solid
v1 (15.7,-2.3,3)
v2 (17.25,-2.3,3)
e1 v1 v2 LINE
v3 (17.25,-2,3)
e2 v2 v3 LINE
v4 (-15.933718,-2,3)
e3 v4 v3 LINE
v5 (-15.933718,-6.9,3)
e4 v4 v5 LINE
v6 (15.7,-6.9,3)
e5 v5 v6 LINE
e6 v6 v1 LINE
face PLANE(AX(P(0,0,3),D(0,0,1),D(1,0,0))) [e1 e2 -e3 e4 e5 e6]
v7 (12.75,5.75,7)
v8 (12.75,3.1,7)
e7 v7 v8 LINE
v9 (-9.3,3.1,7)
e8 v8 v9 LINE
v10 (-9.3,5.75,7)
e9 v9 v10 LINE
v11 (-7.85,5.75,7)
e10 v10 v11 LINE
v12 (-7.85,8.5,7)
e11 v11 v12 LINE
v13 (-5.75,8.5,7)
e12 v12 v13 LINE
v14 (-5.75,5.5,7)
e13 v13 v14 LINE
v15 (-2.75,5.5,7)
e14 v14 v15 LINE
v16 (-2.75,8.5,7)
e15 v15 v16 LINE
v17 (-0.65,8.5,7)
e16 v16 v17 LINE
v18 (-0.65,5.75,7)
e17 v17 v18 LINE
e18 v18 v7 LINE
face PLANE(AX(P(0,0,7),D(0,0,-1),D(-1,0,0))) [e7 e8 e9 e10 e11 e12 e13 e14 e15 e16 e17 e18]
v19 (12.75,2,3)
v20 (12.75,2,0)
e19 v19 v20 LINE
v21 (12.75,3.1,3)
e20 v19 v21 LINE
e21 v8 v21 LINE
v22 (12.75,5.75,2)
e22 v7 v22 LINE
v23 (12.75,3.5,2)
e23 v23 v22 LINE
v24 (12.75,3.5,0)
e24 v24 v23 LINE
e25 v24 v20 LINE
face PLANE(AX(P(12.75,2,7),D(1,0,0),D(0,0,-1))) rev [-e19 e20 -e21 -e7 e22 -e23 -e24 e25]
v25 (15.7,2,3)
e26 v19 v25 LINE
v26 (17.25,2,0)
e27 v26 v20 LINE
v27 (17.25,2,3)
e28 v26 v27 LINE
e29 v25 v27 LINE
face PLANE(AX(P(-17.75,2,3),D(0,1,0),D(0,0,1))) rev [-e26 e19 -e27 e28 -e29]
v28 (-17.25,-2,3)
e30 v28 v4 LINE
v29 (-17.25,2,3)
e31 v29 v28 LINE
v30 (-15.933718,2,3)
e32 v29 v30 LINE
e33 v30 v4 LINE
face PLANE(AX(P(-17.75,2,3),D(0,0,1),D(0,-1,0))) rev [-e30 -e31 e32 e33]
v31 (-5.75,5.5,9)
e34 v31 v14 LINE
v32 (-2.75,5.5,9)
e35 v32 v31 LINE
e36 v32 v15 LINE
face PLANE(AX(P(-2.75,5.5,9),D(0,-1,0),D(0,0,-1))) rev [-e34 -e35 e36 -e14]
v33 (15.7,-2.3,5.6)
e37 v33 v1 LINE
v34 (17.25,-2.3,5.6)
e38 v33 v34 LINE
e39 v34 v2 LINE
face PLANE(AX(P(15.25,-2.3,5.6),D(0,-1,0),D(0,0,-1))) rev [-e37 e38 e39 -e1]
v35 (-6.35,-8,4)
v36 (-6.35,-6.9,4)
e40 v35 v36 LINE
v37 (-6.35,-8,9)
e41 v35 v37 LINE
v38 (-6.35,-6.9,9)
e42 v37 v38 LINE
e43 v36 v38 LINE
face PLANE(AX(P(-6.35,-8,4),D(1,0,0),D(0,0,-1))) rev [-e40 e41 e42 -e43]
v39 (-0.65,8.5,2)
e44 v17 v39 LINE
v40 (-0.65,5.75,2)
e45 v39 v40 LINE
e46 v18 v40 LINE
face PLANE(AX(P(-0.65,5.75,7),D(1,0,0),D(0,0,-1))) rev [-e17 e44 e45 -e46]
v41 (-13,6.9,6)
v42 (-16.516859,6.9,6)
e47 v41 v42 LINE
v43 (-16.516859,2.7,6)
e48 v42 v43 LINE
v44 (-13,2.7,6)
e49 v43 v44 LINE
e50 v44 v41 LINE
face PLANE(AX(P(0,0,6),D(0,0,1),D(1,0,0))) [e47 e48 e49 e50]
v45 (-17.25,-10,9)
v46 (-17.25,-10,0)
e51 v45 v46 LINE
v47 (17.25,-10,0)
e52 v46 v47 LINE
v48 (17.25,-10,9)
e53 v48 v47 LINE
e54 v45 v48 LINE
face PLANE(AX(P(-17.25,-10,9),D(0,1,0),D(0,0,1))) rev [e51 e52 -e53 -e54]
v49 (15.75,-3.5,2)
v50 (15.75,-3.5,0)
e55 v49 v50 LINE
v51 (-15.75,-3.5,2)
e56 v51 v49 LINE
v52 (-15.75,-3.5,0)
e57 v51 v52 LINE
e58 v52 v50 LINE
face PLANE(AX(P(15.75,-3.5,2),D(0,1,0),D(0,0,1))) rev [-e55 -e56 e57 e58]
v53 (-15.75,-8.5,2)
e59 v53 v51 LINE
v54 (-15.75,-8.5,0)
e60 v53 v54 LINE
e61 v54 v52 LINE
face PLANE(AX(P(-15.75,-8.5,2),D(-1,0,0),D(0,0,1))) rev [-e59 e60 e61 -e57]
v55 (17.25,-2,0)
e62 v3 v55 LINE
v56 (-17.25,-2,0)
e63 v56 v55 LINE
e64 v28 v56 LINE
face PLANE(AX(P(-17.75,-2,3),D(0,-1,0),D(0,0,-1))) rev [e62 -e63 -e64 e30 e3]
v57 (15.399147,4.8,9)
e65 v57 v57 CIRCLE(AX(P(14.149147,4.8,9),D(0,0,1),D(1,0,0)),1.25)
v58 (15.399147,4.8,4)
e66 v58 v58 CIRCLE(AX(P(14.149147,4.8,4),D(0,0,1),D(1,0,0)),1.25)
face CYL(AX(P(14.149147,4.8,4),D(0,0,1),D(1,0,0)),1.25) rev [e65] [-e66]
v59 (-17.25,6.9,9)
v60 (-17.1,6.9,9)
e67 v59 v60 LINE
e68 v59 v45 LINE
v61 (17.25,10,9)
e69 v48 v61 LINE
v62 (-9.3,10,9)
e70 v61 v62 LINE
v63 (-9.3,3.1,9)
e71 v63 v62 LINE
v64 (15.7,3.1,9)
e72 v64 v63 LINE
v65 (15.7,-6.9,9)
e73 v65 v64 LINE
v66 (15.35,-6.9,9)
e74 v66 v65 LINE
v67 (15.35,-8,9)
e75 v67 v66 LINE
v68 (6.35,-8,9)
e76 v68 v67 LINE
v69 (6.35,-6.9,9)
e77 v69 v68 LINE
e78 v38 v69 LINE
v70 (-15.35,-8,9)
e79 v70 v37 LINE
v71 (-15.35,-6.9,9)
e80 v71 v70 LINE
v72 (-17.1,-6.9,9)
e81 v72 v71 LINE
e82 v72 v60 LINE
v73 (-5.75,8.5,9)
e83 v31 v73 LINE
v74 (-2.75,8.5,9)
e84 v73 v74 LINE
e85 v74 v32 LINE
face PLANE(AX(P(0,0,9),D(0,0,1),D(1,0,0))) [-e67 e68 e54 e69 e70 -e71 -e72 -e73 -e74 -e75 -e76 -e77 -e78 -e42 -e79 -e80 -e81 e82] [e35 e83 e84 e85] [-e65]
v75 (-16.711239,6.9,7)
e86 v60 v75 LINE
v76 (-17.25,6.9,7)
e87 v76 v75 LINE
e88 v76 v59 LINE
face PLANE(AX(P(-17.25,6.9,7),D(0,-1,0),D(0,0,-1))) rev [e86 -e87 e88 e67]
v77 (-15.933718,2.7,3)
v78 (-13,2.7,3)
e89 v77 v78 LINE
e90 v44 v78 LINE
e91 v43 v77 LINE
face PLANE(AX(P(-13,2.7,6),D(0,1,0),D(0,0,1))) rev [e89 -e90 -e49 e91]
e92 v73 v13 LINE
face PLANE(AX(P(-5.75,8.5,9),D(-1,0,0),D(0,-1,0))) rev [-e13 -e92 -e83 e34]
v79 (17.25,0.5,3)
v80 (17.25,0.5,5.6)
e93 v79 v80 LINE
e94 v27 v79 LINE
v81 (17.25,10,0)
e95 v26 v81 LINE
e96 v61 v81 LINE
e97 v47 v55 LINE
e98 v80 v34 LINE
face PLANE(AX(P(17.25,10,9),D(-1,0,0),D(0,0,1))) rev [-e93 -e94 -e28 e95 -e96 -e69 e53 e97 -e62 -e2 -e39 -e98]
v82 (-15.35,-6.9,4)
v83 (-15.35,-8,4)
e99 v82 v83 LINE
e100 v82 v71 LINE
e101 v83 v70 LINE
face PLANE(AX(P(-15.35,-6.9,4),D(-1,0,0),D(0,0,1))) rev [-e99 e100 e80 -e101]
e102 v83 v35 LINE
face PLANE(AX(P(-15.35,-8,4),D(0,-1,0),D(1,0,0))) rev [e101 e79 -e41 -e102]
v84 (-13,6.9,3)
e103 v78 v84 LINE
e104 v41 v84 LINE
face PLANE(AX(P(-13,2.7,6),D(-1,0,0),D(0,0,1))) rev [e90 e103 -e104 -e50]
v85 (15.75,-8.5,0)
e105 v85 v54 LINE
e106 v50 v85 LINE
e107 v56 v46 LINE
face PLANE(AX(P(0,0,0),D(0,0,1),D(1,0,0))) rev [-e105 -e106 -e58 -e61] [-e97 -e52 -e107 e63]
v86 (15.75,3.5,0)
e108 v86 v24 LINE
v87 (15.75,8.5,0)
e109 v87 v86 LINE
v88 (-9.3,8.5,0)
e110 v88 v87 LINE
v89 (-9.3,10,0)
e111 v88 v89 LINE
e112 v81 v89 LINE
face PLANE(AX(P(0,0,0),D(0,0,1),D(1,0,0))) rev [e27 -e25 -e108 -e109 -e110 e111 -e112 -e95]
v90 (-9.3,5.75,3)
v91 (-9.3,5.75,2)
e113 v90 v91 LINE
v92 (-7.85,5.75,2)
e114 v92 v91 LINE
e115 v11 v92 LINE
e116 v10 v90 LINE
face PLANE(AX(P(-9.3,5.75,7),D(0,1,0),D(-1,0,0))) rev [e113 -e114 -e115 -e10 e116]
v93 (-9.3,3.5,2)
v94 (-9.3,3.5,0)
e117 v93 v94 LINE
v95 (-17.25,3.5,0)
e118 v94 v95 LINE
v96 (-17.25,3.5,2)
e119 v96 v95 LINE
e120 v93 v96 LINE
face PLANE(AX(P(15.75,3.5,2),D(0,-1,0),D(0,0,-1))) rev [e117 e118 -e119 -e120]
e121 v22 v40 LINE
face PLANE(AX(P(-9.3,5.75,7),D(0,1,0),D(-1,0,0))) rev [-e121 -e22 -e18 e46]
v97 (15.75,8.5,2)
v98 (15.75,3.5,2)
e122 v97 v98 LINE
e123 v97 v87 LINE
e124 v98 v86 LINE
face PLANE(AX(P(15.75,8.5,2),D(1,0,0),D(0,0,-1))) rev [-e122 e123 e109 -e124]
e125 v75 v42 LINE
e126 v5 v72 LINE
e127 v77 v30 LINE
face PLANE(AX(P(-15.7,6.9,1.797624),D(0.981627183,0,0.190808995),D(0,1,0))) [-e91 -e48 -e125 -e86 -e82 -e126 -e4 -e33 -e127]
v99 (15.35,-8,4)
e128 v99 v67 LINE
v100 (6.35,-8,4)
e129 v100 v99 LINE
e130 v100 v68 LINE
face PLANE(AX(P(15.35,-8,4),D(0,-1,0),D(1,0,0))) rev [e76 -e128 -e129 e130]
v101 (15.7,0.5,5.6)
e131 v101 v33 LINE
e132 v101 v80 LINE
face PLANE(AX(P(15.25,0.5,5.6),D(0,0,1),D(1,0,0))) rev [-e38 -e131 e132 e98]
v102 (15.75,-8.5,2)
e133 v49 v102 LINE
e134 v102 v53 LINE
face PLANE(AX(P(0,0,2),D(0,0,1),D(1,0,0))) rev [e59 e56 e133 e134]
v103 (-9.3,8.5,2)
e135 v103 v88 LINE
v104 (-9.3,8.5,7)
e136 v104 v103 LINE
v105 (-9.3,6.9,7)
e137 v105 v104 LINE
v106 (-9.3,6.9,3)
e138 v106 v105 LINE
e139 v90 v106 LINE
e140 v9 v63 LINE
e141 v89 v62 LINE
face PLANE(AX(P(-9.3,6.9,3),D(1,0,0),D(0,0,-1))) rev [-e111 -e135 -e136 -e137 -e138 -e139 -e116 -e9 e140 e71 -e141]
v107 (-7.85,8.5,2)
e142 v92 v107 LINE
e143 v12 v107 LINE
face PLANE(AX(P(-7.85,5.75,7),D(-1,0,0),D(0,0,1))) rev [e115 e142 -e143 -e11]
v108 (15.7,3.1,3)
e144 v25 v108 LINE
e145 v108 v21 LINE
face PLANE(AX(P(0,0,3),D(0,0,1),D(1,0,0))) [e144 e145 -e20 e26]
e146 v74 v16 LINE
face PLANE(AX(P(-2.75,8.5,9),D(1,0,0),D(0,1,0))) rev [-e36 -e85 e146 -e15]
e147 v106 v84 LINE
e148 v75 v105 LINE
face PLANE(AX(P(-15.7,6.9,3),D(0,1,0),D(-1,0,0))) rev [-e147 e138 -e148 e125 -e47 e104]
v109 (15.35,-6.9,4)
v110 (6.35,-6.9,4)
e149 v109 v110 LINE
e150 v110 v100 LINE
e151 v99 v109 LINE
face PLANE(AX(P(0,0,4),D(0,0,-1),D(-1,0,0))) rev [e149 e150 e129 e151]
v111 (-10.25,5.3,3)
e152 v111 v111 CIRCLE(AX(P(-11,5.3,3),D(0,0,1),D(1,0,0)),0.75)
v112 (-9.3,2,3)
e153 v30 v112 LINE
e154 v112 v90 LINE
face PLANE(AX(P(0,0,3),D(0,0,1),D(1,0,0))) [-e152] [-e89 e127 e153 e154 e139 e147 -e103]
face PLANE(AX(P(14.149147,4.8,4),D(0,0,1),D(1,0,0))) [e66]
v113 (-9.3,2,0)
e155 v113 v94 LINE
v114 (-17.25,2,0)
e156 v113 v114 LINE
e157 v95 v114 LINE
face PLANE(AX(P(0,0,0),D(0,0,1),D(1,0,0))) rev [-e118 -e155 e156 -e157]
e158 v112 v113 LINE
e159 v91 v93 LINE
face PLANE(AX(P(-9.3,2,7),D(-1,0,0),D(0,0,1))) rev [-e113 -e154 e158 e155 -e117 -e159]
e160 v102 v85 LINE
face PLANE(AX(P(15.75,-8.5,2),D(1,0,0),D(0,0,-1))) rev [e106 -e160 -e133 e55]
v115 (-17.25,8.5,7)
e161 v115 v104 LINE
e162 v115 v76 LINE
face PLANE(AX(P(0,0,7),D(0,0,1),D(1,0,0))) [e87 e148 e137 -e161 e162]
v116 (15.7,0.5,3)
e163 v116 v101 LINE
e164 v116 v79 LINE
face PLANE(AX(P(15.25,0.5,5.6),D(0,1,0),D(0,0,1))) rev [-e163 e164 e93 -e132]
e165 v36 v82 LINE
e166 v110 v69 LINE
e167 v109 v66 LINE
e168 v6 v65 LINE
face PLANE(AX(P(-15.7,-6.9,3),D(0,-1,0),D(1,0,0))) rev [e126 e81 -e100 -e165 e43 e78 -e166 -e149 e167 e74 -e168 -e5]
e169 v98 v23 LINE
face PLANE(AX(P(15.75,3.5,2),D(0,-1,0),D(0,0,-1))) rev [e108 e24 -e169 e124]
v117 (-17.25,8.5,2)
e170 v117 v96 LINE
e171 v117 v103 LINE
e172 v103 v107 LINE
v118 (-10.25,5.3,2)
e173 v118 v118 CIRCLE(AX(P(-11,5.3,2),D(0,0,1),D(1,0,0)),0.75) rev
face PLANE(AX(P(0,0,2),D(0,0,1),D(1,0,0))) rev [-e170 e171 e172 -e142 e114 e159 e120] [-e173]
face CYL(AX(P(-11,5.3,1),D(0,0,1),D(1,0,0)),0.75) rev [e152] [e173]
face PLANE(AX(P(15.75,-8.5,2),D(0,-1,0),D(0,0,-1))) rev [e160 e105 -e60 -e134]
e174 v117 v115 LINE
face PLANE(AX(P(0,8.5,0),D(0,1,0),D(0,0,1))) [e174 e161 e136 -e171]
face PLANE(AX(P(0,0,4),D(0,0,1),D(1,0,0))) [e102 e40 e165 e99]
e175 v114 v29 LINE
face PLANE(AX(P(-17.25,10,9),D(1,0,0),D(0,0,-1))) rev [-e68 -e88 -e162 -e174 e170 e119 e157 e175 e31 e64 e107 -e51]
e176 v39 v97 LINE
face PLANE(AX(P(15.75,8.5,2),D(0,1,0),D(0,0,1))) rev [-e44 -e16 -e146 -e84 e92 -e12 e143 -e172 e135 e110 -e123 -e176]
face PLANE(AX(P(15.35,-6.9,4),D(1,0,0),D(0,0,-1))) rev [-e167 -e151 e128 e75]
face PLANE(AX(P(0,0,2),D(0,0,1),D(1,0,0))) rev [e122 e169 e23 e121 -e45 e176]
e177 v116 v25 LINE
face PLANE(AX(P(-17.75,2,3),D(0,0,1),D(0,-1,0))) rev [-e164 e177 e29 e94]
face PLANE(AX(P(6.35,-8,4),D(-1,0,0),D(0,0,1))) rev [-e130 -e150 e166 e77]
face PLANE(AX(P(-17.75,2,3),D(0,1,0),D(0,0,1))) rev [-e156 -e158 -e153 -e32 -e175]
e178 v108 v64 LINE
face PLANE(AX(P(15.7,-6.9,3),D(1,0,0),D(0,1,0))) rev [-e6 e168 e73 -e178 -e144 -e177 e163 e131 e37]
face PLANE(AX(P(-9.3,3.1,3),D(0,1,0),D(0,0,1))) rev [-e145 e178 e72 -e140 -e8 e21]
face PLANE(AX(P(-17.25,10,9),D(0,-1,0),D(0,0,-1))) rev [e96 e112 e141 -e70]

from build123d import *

# Parameters (mm, degrees)
SKETCH1_W           = 34.5
SKETCH1_H           = 20
BOSS_EXTRUDE1_DEPTH = 9
CUT_EXTRUDE1_DEPTH  = 6
SKETCH5_W           = 3
SKETCH5_H           = 4
CUT_EXTRUDE2_DEPTH  = 35
SKETCH7_W           = 2.7
SKETCH7_H           = 4.2
BOSS_EXTRUDE3_DEPTH = 3
SKETCH14_R          = 0.75
CUT_EXTRUDE9_DEPTH  = 2
SKETCH8_R           = 1.25
SKETCH8_W           = 9
SKETCH8_H           = 1.1
CUT_EXTRUDE3_DEPTH  = 5
CHAMFER1_SIZE       = 1.4
CHAMFER1_SIZE_2     = 7.202375622
SKETCH6_W           = 31.5
SKETCH6_H           = 5
CUT_EXTRUDE6_DEPTH  = 2
SKETCH11_W          = 2.6
SKETCH11_H          = 2.8
CUT_EXTRUDE7_DEPTH  = 2
SKETCH12_W          = 3
SKETCH12_H          = 3
CUT_EXTRUDE8_DEPTH  = 7
SKETCH16_W          = 7.95
SKETCH16_H          = 3.1
CUT_EXTRUDE10_DEPTH = 2
SKETCH17_W          = 7.95
SKETCH17_H          = 7
CUT_EXTRUDE11_DEPTH = 1.5
SKETCH18_W          = 1.5
SKETCH18_H          = 5
CUT_EXTRUDE12_DEPTH = 2
SKETCH20_W          = 22.05
SKETCH20_H          = 3.75
CUT_EXTRUDE13_DEPTH = 7
SKETCH21_W          = 7.2
SKETCH21_H          = 2.75
CUT_EXTRUDE14_DEPTH = 5


with BuildPart() as part:
    # Sketch1 → Boss-Extrude1 (new body)
    with BuildSketch(Plane.XY):
        Rectangle(SKETCH1_W, SKETCH1_H)
    extrude(amount=BOSS_EXTRUDE1_DEPTH)

    # Sketch3 → Cut-Extrude1 (cut)
    with BuildSketch(Plane.XY.offset(9)):
        Polygon((15.7, -6.9), (15.7, 3.1), (-9.3, 3.1), (-9.3, 6.9), (-15.7, 6.9), (-15.7, -6.9), align=None)
    extrude(amount=-CUT_EXTRUDE1_DEPTH, mode=Mode.SUBTRACT)

    # Sketch5 → Cut-Extrude2 (cut)
    with BuildSketch(Plane(origin=(17.25, 0, 0), x_dir=(0, 0, -1), z_dir=(1, 0, 0))):
        with Locations((-1.5, 0)):
            Rectangle(SKETCH5_W, SKETCH5_H)
    extrude(amount=-CUT_EXTRUDE2_DEPTH, mode=Mode.SUBTRACT)

    # Sketch7 → Boss-Extrude3 (add)
    with BuildSketch(Plane.XY.offset(3)):
        with Locations((-14.35, 4.8)):
            Rectangle(SKETCH7_W, SKETCH7_H)
    extrude(amount=BOSS_EXTRUDE3_DEPTH)

    # Sketch14 → Cut-Extrude9 (cut)
    with BuildSketch(Plane.XY.offset(3)):
        with Locations((-11, 5.3)):
            Circle(SKETCH14_R)
    extrude(amount=-CUT_EXTRUDE9_DEPTH, mode=Mode.SUBTRACT)

    # Sketch8 → Cut-Extrude3 (cut)
    with BuildSketch(Plane.XY.offset(9)):
        with Locations((14.149147106, 4.8)):
            Circle(SKETCH8_R)
        with Locations((-10.85, -7.45)):
            Rectangle(SKETCH8_W, SKETCH8_H)
        with Locations((10.85, -7.45)):
            Rectangle(SKETCH8_W, SKETCH8_H)
    extrude(amount=-CUT_EXTRUDE3_DEPTH, mode=Mode.SUBTRACT)

    # Chamfer1
    # the kernel refuses this chamfer: 7.202375622, 1.4 mm, written as the material it takes off along each edge
    with BuildSketch(Plane(origin=(-15.7, 6.9, 9), x_dir=(-0.9816291836389949, 0, 0.190798704996235), z_dir=(0, -1, 0))) as chamfer1_piece_1_section:
        Polygon((CHAMFER1_SIZE * 0.981629183639, CHAMFER1_SIZE * 0.190798704996), (-CHAMFER1_SIZE_2 * 0.190798705006, CHAMFER1_SIZE_2 * 0.981629183688), (0, 0), align=None)
    chamfer1_piece_1 = extrude(amount=13.8, mode=Mode.PRIVATE)
    chamfer1_piece_1 = split(chamfer1_piece_1, bisect_by=Plane(origin=(-16.266997619, 4.8, 6), z_dir=(0, 0, 1)), keep=Keep.TOP, mode=Mode.PRIVATE)
    add(chamfer1_piece_1, mode=Mode.SUBTRACT)
    with BuildSketch(Plane(origin=(-15.7, 25.613448453, 9), x_dir=(-0.9816291836389951, 0, 0.19079870499623477), z_dir=(0, -1, 0))) as chamfer1_piece_2_section:
        Polygon((CHAMFER1_SIZE * 0.981629183639, CHAMFER1_SIZE * 0.190798704996), (-CHAMFER1_SIZE_2 * 0.190798705006, CHAMFER1_SIZE_2 * 0.981629183688), (0, 0), align=None)
    chamfer1_piece_2 = extrude(amount=32.513448453, mode=Mode.PRIVATE)
    chamfer1_piece_2 = split(chamfer1_piece_2, bisect_by=Plane(origin=(-15.989617837, 2.35, 3), z_dir=(0, 0, 1)), keep=Keep.TOP, mode=Mode.PRIVATE)
    chamfer1_piece_2 = split(chamfer1_piece_2, bisect_by=Plane(origin=(-15.989617837, 2.7, 4.777533587), z_dir=(0, -1, 0)), keep=Keep.TOP, mode=Mode.PRIVATE)
    add(chamfer1_piece_2, mode=Mode.SUBTRACT)

    # Sketch6 → Cut-Extrude6 (cut)
    with BuildSketch(Plane(origin=(0, 0, 0), x_dir=(-1, 0, 0), z_dir=(0, 0, -1))):
        with Locations((0, 6)):
            Rectangle(SKETCH6_W, SKETCH6_H)
        with Locations((0, -6)):
            Rectangle(SKETCH6_W, SKETCH6_H)
    extrude(amount=-CUT_EXTRUDE6_DEPTH, mode=Mode.SUBTRACT)

    # Sketch11 → Cut-Extrude7 (cut)
    with BuildSketch(Plane(origin=(17.25, 0, 0), x_dir=(0, 0, -1), z_dir=(1, 0, 0))):
        with Locations((-4.3, -0.9)):
            Rectangle(SKETCH11_W, SKETCH11_H)
    extrude(amount=-CUT_EXTRUDE7_DEPTH, mode=Mode.SUBTRACT)

    # Sketch12 → Cut-Extrude8 (cut)
    with BuildSketch(Plane(origin=(0, 0, 2), x_dir=(-1, 0, 0), z_dir=(0, 0, -1))):
        with Locations((4.25, 7)):
            Rectangle(SKETCH12_W, SKETCH12_H)
    extrude(amount=-CUT_EXTRUDE8_DEPTH, mode=Mode.SUBTRACT)

    # Sketch16 → Cut-Extrude10 (cut)
    with BuildSketch(Plane.XY.offset(9)):
        with Locations((-13.275, 8.45)):
            Rectangle(SKETCH16_W, SKETCH16_H)
    extrude(amount=-CUT_EXTRUDE10_DEPTH, mode=Mode.SUBTRACT)

    # Sketch17 → Cut-Extrude11 (cut)
    with BuildSketch(Plane(origin=(0, 10, 0), x_dir=(1, 0, 0), z_dir=(0, 1, 0))):
        with Locations((-13.275, -3.5)):
            Rectangle(SKETCH17_W, SKETCH17_H)
    extrude(amount=-CUT_EXTRUDE11_DEPTH, mode=Mode.SUBTRACT)

    # Sketch18 → Cut-Extrude12 (cut)
    with BuildSketch(Plane.XY):
        with Locations((-16.5, 6)):
            Rectangle(SKETCH18_W, SKETCH18_H)
    extrude(amount=CUT_EXTRUDE12_DEPTH, mode=Mode.SUBTRACT)

    # Sketch20 → Cut-Extrude13 (cut)
    with BuildSketch(Plane(origin=(0, 0, 0), x_dir=(-1, 0, 0), z_dir=(0, 0, -1))):
        with Locations((-1.725, 3.875)):
            Rectangle(SKETCH20_W, SKETCH20_H)
    extrude(amount=-CUT_EXTRUDE13_DEPTH, mode=Mode.SUBTRACT)

    # Sketch21 → Cut-Extrude14 (cut)
    with BuildSketch(Plane(origin=(0, 0, 2), x_dir=(-1, 0, 0), z_dir=(0, 0, -1))):
        with Locations((4.25, 7.125)):
            Rectangle(SKETCH21_W, SKETCH21_H)
    extrude(amount=-CUT_EXTRUDE14_DEPTH, mode=Mode.SUBTRACT)


solid = part.part
